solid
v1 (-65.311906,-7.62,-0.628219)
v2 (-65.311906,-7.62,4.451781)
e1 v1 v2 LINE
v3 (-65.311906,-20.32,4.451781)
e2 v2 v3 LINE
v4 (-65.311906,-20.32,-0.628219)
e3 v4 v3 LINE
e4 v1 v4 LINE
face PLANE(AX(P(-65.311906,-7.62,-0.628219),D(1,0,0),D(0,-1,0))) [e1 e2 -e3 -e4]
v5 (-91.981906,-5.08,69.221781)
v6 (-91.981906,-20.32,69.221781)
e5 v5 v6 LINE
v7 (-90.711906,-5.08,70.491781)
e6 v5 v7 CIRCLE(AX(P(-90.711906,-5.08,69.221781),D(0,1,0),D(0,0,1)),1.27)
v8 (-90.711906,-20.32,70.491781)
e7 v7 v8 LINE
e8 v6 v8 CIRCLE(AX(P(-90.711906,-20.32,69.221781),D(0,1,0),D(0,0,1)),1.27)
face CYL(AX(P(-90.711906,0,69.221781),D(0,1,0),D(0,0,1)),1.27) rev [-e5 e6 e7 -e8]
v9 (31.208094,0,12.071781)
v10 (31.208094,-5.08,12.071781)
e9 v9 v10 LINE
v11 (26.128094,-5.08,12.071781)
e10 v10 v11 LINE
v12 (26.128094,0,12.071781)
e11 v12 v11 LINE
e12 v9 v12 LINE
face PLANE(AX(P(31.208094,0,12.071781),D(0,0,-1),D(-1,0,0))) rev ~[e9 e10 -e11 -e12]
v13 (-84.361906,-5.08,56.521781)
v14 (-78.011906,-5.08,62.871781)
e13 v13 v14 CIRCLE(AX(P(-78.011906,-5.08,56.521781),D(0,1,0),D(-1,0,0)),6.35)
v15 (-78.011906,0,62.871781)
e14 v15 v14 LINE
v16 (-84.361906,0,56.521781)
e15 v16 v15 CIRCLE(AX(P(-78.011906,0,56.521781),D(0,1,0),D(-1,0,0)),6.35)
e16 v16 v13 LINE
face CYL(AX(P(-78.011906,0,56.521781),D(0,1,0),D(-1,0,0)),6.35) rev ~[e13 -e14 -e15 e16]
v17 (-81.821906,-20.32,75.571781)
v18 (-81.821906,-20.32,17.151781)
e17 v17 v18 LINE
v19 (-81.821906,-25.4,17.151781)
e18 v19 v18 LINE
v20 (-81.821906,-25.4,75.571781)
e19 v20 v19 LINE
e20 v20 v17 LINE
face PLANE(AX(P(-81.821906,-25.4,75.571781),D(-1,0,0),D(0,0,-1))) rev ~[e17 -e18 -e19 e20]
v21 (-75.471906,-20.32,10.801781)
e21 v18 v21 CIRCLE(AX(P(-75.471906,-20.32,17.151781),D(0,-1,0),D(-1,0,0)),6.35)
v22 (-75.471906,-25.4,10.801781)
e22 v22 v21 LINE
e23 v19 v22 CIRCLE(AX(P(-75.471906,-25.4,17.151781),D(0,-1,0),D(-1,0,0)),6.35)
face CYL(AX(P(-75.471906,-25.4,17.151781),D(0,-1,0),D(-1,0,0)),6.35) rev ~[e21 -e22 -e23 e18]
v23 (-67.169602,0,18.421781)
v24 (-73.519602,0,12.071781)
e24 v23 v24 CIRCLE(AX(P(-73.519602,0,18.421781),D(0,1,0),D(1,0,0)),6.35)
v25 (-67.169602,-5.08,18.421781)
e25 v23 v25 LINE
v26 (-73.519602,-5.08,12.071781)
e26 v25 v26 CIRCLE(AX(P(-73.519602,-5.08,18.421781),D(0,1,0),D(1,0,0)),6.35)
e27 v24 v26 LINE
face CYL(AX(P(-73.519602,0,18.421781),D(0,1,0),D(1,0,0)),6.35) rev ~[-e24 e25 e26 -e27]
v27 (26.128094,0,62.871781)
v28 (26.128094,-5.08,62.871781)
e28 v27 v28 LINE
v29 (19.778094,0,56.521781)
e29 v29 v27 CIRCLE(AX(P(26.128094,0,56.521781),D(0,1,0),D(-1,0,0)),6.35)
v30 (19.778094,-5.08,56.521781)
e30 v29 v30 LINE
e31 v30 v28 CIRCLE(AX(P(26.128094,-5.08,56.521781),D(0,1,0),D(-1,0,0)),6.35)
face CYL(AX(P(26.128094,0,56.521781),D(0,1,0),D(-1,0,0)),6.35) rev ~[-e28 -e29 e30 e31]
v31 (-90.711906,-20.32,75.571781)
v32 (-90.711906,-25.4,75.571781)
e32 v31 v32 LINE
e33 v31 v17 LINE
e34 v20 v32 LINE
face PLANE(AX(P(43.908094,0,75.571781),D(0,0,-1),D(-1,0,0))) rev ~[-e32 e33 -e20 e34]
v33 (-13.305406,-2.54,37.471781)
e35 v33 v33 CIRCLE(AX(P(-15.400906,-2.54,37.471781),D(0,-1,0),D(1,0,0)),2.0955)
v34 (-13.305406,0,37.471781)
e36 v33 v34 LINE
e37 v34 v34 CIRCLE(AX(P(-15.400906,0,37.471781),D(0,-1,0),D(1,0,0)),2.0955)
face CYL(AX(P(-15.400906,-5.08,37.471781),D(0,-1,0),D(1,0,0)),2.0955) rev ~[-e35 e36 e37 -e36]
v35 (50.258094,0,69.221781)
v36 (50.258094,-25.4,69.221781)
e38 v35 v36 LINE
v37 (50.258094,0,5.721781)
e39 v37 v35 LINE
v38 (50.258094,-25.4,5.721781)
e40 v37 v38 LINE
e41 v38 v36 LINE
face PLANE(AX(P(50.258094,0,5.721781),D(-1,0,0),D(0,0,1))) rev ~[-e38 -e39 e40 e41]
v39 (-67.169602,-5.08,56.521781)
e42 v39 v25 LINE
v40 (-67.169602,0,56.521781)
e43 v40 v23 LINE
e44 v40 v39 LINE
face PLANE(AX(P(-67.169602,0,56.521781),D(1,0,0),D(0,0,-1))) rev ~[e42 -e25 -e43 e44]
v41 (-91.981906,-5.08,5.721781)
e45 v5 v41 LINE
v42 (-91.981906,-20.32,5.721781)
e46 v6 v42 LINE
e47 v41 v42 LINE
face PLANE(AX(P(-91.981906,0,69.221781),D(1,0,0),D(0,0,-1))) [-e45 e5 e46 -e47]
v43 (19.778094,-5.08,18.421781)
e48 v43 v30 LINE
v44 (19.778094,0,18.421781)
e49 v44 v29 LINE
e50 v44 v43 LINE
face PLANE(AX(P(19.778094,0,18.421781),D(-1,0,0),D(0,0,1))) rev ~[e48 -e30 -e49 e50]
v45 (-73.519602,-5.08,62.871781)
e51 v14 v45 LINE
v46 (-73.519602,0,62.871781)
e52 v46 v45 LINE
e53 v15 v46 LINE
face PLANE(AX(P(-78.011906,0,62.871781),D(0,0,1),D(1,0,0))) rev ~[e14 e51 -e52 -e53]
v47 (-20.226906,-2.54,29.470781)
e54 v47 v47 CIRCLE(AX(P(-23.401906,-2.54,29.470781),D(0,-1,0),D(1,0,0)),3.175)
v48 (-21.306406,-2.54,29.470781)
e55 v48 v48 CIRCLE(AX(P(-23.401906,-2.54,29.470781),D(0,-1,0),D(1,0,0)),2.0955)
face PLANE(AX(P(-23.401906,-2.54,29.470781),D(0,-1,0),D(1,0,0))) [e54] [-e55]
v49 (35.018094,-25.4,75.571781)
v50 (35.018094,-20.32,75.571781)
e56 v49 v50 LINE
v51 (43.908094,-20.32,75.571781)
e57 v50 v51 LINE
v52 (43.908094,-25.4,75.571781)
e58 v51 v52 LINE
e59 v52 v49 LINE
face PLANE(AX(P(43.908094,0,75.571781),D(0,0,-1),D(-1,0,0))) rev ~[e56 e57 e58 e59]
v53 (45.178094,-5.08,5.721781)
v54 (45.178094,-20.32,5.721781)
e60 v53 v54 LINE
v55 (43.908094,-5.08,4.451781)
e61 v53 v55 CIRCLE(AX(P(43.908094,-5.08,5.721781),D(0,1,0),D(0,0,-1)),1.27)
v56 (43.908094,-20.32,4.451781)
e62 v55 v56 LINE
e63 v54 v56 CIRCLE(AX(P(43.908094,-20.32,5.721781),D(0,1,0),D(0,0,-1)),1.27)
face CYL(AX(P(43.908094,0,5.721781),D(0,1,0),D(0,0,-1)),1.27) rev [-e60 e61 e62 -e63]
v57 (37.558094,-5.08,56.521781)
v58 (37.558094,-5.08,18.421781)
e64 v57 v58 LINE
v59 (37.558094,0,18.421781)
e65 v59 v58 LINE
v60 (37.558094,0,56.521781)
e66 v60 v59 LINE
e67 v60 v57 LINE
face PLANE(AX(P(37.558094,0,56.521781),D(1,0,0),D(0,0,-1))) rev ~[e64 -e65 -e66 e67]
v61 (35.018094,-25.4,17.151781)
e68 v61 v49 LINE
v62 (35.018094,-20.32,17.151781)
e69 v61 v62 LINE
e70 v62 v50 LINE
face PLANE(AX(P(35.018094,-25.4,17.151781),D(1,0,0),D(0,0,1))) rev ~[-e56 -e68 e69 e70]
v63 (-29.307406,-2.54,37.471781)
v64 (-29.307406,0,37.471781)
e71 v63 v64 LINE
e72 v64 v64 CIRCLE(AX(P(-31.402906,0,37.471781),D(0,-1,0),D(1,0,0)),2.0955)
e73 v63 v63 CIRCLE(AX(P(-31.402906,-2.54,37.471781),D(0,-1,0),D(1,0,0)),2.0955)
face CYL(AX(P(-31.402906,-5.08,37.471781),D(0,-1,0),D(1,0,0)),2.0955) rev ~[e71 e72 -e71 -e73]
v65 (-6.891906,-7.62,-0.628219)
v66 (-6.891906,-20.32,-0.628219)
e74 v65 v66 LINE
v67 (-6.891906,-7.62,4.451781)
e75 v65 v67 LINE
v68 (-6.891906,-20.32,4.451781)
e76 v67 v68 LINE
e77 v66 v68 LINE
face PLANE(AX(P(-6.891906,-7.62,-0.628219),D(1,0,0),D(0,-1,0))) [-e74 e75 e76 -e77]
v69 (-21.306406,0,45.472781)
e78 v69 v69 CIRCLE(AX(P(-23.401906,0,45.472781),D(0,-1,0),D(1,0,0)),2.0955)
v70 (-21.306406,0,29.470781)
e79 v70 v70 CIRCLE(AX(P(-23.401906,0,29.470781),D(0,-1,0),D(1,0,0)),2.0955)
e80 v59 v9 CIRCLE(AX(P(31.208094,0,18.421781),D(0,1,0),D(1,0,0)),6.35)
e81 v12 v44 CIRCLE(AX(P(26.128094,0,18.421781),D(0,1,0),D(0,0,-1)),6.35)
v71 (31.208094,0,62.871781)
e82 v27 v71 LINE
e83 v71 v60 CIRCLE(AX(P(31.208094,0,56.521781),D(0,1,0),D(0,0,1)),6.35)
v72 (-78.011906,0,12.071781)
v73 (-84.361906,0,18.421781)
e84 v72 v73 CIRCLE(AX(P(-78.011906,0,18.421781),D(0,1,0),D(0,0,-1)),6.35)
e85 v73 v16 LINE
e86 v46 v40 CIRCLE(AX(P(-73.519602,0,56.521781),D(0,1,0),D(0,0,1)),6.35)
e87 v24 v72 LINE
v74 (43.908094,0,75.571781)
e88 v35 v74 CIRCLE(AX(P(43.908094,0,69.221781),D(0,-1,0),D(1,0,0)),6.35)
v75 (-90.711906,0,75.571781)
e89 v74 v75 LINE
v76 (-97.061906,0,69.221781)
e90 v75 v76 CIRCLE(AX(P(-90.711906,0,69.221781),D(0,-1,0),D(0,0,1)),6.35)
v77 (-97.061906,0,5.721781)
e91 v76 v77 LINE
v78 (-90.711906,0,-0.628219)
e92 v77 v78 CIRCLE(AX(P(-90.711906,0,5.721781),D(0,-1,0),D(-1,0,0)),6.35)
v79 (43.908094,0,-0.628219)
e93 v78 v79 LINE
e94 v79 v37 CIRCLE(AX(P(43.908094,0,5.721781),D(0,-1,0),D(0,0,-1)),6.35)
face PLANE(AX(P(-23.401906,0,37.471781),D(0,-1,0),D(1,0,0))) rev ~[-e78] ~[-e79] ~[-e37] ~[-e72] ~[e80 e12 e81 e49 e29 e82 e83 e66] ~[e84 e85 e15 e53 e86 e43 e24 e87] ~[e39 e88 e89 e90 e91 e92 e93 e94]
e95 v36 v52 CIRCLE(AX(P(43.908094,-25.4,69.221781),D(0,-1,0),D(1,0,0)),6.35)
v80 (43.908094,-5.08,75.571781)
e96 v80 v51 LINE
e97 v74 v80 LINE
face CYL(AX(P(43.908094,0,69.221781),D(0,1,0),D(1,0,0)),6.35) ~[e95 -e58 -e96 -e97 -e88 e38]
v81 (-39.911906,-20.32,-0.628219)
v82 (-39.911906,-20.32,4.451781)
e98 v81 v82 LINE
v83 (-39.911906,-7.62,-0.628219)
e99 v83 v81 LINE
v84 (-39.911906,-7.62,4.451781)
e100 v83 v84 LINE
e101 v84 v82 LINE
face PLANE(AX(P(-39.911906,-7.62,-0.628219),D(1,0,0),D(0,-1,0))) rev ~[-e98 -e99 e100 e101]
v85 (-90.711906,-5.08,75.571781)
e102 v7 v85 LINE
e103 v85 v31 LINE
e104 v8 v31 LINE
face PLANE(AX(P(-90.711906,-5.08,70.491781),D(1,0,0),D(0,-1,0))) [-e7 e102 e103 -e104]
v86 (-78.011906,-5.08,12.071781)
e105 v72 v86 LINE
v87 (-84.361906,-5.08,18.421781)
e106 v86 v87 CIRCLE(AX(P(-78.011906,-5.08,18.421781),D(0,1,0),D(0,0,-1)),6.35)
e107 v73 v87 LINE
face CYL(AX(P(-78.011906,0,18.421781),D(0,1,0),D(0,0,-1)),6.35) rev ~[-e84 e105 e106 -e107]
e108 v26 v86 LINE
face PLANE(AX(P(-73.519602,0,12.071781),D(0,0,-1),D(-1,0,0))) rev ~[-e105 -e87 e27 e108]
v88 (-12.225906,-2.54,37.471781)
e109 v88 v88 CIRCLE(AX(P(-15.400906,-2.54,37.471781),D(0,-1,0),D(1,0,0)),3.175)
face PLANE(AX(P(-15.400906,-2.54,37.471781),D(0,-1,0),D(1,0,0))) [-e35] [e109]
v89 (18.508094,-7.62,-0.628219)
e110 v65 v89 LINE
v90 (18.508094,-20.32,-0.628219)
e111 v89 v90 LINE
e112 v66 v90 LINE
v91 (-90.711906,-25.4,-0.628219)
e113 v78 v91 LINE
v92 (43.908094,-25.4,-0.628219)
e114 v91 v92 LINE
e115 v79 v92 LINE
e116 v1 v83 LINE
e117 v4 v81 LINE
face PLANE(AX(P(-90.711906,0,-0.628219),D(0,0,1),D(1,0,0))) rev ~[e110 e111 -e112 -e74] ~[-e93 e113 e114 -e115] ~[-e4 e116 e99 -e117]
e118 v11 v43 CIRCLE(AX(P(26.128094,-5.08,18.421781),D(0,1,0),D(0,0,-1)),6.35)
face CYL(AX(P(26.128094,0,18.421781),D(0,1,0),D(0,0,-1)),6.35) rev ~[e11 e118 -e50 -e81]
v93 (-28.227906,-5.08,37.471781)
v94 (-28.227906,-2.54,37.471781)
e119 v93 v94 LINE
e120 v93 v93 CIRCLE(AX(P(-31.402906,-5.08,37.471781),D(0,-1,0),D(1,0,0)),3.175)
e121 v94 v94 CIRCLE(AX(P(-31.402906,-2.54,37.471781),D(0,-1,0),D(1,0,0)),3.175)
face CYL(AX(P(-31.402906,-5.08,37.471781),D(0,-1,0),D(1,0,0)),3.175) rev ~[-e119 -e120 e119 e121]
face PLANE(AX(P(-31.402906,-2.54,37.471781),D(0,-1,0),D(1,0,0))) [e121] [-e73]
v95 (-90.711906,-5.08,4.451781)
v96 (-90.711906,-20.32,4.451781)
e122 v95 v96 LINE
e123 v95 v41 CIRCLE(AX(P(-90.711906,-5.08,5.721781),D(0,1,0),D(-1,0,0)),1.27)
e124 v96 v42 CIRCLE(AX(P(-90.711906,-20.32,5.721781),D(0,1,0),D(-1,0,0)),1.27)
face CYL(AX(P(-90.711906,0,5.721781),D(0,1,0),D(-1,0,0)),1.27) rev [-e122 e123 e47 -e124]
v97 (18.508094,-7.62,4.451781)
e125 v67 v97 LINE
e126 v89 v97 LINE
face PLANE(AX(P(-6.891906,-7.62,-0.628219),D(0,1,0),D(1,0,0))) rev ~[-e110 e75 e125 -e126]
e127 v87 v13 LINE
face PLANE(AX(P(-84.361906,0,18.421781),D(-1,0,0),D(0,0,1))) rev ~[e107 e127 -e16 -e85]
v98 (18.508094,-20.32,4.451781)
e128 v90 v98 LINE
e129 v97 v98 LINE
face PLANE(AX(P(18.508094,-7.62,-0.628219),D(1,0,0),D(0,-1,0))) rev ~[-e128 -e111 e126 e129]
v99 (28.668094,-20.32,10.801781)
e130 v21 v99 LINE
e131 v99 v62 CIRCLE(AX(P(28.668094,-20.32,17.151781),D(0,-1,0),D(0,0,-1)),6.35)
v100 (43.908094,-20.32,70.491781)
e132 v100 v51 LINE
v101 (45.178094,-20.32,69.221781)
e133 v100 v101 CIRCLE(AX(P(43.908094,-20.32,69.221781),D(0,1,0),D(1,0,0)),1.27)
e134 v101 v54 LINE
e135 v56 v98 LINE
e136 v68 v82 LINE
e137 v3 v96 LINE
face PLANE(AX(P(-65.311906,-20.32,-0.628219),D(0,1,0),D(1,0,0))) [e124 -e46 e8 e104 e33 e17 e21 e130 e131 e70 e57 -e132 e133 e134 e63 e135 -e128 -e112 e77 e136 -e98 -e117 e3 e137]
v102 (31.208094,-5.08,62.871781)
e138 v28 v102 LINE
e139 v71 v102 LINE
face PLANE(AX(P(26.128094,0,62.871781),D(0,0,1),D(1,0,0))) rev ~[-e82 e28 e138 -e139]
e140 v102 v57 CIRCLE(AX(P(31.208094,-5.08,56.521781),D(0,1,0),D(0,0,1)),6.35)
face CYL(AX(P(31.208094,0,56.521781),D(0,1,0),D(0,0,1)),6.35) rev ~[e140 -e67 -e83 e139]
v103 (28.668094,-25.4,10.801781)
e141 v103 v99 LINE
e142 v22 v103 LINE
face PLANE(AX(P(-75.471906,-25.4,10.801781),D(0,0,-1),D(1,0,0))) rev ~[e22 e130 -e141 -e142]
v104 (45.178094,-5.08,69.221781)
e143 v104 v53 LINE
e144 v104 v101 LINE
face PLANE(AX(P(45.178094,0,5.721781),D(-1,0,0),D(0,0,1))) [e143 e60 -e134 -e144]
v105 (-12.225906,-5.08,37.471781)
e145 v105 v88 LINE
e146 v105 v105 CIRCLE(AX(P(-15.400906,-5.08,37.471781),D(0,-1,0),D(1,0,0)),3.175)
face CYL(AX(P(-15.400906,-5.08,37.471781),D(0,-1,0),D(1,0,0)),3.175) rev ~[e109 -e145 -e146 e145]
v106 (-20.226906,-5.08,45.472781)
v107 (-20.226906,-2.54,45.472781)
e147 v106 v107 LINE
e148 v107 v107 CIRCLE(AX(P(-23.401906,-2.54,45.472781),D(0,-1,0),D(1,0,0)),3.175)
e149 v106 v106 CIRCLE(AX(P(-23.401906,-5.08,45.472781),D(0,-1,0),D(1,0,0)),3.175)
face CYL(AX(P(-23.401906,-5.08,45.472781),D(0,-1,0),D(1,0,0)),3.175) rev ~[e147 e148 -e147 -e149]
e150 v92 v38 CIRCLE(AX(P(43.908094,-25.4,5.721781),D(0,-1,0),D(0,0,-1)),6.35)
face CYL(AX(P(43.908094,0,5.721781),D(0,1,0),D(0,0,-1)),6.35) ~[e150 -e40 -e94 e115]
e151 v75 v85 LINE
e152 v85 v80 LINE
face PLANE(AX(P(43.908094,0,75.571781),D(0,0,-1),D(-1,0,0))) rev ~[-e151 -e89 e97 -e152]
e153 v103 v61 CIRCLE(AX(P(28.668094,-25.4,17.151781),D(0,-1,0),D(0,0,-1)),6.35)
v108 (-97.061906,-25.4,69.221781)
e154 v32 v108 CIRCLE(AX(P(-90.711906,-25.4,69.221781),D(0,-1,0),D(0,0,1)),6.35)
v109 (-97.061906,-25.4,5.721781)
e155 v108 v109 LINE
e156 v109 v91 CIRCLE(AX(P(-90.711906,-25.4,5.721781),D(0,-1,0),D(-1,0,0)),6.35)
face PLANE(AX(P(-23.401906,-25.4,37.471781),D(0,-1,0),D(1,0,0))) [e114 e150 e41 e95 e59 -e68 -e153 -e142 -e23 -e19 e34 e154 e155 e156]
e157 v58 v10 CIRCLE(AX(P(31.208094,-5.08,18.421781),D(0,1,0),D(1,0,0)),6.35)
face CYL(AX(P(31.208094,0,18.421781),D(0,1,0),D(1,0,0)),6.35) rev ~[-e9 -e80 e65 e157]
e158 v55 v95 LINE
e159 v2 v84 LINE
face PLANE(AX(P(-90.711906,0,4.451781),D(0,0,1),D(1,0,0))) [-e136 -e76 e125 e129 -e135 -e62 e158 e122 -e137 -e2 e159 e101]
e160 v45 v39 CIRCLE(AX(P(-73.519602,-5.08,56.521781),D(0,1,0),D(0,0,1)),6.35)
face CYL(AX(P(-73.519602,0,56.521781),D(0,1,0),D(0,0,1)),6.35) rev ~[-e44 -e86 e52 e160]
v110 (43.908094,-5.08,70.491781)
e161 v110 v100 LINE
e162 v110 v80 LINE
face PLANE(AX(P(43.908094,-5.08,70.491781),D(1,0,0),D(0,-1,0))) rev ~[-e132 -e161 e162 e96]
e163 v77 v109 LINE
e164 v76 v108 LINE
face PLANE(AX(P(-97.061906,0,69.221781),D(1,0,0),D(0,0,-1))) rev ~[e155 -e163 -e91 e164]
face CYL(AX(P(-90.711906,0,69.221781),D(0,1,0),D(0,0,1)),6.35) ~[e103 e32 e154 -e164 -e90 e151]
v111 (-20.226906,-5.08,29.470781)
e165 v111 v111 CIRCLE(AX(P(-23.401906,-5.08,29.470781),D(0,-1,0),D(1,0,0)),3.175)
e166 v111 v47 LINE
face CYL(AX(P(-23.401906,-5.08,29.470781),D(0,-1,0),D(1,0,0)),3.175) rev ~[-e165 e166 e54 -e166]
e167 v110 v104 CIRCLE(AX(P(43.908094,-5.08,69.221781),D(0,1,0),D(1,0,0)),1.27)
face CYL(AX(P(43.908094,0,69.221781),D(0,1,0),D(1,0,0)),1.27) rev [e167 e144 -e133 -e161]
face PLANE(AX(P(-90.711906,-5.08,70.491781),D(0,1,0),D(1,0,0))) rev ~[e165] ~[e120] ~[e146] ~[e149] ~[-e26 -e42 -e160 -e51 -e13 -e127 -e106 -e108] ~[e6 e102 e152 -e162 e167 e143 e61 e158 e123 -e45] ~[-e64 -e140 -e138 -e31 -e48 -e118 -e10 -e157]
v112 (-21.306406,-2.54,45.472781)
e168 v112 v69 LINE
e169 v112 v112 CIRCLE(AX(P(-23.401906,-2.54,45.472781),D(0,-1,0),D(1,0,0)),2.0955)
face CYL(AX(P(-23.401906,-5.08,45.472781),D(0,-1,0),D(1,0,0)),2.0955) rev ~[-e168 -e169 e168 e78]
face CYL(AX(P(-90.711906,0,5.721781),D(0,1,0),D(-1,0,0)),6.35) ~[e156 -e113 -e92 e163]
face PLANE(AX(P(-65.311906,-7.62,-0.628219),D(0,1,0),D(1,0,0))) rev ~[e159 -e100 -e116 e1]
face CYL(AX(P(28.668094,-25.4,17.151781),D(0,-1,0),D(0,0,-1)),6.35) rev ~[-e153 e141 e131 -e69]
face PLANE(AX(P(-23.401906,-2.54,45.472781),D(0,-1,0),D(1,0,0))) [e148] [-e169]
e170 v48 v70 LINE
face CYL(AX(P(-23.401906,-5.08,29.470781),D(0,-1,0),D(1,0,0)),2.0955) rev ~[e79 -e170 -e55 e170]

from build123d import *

# Parameters (mm, degrees)
F1_DEPTH  = 25.4
F2_T      = -5.08
F4_DEPTH  = 5.08
F6_DEPTH  = 5.08
F7_R      = 2.0955
F8_DEPTH  = 5.08
F9_R      = 3.175
F9_R_2    = 2.0955
F10_DEPTH = 2.54
F11_W     = 25.4
F11_H     = 12.7
F12_DEPTH = 5.08


# Not quite as in the source:
# - a shell that OpenCascade refuses in one call is made with other operations: the cavity is built on its own and cut out


with BuildPart() as f1:
    # F0 (on Front) → F1 (new body)
    with BuildSketch(Plane.XZ):
        with BuildLine():
            Line((43.9080937201, 75.5717812867), (-90.7119062799, 75.5717812867))
            ThreePointArc((-90.7119062799, 75.5717812867), (-95.2020343405, 73.7119093473), (-97.0619062799, 69.2217812867))
            Line((-97.0619062799, 69.2217812867), (-97.0619062799, 5.7217812867))
            ThreePointArc((-97.0619062799, 5.7217812867), (-95.2020343405, 1.2316532262), (-90.7119062799, -0.6282187133))
            Line((-90.7119062799, -0.6282187133), (43.9080937201, -0.6282187133))
            ThreePointArc((43.9080937201, -0.6282187133), (48.3982217806, 1.2316532262), (50.2580937201, 5.7217812867))
            Line((50.2580937201, 5.7217812867), (50.2580937201, 69.2217812867))
            ThreePointArc((50.2580937201, 69.2217812867), (48.3982217806, 73.7119093473), (43.9080937201, 75.5717812867))
        make_face()
    extrude(amount=F1_DEPTH)

    # F2: a shell. OpenCascade refuses it in one call, so the cavity is built on its own and cut out:
    # the body offset inwards by the wall thickness, plus a prism from it out through each open face.
    f2_core = offset(f1.part, amount=F2_T, mode=Mode.PRIVATE)
    f2_exits = [f2_core.faces().sort_by_distance(p)[0] for p in [
        (-23.401906, -12.7, 70.491781),
    ]]
    add(f2_core, mode=Mode.SUBTRACT)
    extrude(f2_exits, amount=-F2_T, mode=Mode.SUBTRACT)

    # F3 (on face) → F4 (cut)
    with BuildSketch(Plane.XZ.offset(25.4)):
        with BuildLine():
            Line((35.0180937201, 75.5717812867), (-81.8219062799, 75.5717812867))
            Line((-81.8219062799, 75.5717812867), (-81.8219062799, 17.1517812867))
            ThreePointArc((-81.8219062799, 17.1517812867), (-79.9620343405, 12.6616532262), (-75.4719062799, 10.8017812867))
            Line((-75.4719062799, 10.8017812867), (28.6680937201, 10.8017812867))
            ThreePointArc((28.6680937201, 10.8017812867), (33.1582217806, 12.6616532262), (35.0180937201, 17.1517812867))
            Line((35.0180937201, 17.1517812867), (35.0180937201, 75.5717812867))
        make_face()
    extrude(amount=-F4_DEPTH, mode=Mode.SUBTRACT)

    # F5 (on face) → F6 (cut)
    with BuildSketch(Plane(origin=(0, 0, 0), x_dir=(-1, 0, 0), z_dir=(0, 1, 0))):
        with BuildLine():
            Line((-26.1280937201, 62.8717812867), (-31.2080937201, 62.8717812867))
            ThreePointArc((-31.2080937201, 62.8717812867), (-35.6982217806, 61.0119093473), (-37.5580937201, 56.5217812867))
            Line((-37.5580937201, 56.5217812867), (-37.5580937201, 18.4217812867))
            ThreePointArc((-37.5580937201, 18.4217812867), (-35.6982217806, 13.9316532262), (-31.2080937201, 12.0717812867))
            Line((-31.2080937201, 12.0717812867), (-26.1280937201, 12.0717812867))
            ThreePointArc((-26.1280937201, 12.0717812867), (-21.6379656595, 13.9316532262), (-19.7780937201, 18.4217812867))
            Line((-19.7780937201, 18.4217812867), (-19.7780937201, 56.5217812867))
            ThreePointArc((-19.7780937201, 56.5217812867), (-21.6379656595, 61.0119093473), (-26.1280937201, 62.8717812867))
        make_face()
        with BuildLine():
            Line((78.0119062799, 62.8717812867), (73.519602201, 62.8717812867))
            ThreePointArc((73.519602201, 62.8717812867), (69.0294741405, 61.0119093473), (67.169602201, 56.5217812867))
            Line((67.169602201, 56.5217812867), (67.169602201, 18.4217812867))
            ThreePointArc((67.169602201, 18.4217812867), (69.0294741405, 13.9316532262), (73.519602201, 12.0717812867))
            Line((73.519602201, 12.0717812867), (78.0119062799, 12.0717812867))
            ThreePointArc((78.0119062799, 12.0717812867), (82.5020343405, 13.9316532262), (84.3619062799, 18.4217812867))
            Line((84.3619062799, 18.4217812867), (84.3619062799, 56.5217812867))
            ThreePointArc((84.3619062799, 56.5217812867), (82.5020343405, 61.0119093473), (78.0119062799, 62.8717812867))
        make_face()
    extrude(amount=-F6_DEPTH, mode=Mode.SUBTRACT)

    # F7 (on face) → F8 (cut)
    with BuildSketch(Plane.XZ.offset(5.08)):
        with Locations((-23.4019062799, 45.4727812867)):
            Circle(F7_R)
        with Locations((-31.4029062799, 37.4717812867)):
            Circle(F7_R)
        with Locations((-23.4019062799, 29.4707812867)):
            Circle(F7_R)
        with Locations((-15.4009062799, 37.4717812867)):
            Circle(F7_R)
    extrude(amount=-F8_DEPTH, mode=Mode.SUBTRACT)

    # F9 (on face) → F10 (cut)
    with BuildSketch(Plane.XZ.offset(5.08)):
        with Locations((-31.4029062799, 37.4717812867)):
            Circle(F9_R)
        with Locations((-31.4029062799, 37.4717812867)):
            Circle(F9_R_2, mode=Mode.SUBTRACT)
        with Locations((-23.4019062799, 45.4727812867)):
            Circle(F9_R)
        with Locations((-23.4019062799, 45.4727812867)):
            Circle(F9_R_2, mode=Mode.SUBTRACT)
        with Locations((-15.4009062799, 37.4717812867)):
            Circle(F9_R)
        with Locations((-15.4009062799, 37.4717812867)):
            Circle(F9_R_2, mode=Mode.SUBTRACT)
        with Locations((-23.4019062799, 29.4707812867)):
            Circle(F9_R)
        with Locations((-23.4019062799, 29.4707812867)):
            Circle(F9_R_2, mode=Mode.SUBTRACT)
    extrude(amount=-F10_DEPTH, mode=Mode.SUBTRACT)

    # F11 (on face) → F12 (cut)
    with BuildSketch(Plane(origin=(0, 0, -0.6282187133), x_dir=(1, 0, 0), z_dir=(0, 0, -1))):
        with Locations((-52.6119062799, 13.97)):
            Rectangle(F11_W, F11_H)
        with Locations((5.8080937201, 13.97)):
            Rectangle(F11_W, F11_H)
    extrude(amount=-F12_DEPTH, mode=Mode.SUBTRACT)


solid = f1.part
